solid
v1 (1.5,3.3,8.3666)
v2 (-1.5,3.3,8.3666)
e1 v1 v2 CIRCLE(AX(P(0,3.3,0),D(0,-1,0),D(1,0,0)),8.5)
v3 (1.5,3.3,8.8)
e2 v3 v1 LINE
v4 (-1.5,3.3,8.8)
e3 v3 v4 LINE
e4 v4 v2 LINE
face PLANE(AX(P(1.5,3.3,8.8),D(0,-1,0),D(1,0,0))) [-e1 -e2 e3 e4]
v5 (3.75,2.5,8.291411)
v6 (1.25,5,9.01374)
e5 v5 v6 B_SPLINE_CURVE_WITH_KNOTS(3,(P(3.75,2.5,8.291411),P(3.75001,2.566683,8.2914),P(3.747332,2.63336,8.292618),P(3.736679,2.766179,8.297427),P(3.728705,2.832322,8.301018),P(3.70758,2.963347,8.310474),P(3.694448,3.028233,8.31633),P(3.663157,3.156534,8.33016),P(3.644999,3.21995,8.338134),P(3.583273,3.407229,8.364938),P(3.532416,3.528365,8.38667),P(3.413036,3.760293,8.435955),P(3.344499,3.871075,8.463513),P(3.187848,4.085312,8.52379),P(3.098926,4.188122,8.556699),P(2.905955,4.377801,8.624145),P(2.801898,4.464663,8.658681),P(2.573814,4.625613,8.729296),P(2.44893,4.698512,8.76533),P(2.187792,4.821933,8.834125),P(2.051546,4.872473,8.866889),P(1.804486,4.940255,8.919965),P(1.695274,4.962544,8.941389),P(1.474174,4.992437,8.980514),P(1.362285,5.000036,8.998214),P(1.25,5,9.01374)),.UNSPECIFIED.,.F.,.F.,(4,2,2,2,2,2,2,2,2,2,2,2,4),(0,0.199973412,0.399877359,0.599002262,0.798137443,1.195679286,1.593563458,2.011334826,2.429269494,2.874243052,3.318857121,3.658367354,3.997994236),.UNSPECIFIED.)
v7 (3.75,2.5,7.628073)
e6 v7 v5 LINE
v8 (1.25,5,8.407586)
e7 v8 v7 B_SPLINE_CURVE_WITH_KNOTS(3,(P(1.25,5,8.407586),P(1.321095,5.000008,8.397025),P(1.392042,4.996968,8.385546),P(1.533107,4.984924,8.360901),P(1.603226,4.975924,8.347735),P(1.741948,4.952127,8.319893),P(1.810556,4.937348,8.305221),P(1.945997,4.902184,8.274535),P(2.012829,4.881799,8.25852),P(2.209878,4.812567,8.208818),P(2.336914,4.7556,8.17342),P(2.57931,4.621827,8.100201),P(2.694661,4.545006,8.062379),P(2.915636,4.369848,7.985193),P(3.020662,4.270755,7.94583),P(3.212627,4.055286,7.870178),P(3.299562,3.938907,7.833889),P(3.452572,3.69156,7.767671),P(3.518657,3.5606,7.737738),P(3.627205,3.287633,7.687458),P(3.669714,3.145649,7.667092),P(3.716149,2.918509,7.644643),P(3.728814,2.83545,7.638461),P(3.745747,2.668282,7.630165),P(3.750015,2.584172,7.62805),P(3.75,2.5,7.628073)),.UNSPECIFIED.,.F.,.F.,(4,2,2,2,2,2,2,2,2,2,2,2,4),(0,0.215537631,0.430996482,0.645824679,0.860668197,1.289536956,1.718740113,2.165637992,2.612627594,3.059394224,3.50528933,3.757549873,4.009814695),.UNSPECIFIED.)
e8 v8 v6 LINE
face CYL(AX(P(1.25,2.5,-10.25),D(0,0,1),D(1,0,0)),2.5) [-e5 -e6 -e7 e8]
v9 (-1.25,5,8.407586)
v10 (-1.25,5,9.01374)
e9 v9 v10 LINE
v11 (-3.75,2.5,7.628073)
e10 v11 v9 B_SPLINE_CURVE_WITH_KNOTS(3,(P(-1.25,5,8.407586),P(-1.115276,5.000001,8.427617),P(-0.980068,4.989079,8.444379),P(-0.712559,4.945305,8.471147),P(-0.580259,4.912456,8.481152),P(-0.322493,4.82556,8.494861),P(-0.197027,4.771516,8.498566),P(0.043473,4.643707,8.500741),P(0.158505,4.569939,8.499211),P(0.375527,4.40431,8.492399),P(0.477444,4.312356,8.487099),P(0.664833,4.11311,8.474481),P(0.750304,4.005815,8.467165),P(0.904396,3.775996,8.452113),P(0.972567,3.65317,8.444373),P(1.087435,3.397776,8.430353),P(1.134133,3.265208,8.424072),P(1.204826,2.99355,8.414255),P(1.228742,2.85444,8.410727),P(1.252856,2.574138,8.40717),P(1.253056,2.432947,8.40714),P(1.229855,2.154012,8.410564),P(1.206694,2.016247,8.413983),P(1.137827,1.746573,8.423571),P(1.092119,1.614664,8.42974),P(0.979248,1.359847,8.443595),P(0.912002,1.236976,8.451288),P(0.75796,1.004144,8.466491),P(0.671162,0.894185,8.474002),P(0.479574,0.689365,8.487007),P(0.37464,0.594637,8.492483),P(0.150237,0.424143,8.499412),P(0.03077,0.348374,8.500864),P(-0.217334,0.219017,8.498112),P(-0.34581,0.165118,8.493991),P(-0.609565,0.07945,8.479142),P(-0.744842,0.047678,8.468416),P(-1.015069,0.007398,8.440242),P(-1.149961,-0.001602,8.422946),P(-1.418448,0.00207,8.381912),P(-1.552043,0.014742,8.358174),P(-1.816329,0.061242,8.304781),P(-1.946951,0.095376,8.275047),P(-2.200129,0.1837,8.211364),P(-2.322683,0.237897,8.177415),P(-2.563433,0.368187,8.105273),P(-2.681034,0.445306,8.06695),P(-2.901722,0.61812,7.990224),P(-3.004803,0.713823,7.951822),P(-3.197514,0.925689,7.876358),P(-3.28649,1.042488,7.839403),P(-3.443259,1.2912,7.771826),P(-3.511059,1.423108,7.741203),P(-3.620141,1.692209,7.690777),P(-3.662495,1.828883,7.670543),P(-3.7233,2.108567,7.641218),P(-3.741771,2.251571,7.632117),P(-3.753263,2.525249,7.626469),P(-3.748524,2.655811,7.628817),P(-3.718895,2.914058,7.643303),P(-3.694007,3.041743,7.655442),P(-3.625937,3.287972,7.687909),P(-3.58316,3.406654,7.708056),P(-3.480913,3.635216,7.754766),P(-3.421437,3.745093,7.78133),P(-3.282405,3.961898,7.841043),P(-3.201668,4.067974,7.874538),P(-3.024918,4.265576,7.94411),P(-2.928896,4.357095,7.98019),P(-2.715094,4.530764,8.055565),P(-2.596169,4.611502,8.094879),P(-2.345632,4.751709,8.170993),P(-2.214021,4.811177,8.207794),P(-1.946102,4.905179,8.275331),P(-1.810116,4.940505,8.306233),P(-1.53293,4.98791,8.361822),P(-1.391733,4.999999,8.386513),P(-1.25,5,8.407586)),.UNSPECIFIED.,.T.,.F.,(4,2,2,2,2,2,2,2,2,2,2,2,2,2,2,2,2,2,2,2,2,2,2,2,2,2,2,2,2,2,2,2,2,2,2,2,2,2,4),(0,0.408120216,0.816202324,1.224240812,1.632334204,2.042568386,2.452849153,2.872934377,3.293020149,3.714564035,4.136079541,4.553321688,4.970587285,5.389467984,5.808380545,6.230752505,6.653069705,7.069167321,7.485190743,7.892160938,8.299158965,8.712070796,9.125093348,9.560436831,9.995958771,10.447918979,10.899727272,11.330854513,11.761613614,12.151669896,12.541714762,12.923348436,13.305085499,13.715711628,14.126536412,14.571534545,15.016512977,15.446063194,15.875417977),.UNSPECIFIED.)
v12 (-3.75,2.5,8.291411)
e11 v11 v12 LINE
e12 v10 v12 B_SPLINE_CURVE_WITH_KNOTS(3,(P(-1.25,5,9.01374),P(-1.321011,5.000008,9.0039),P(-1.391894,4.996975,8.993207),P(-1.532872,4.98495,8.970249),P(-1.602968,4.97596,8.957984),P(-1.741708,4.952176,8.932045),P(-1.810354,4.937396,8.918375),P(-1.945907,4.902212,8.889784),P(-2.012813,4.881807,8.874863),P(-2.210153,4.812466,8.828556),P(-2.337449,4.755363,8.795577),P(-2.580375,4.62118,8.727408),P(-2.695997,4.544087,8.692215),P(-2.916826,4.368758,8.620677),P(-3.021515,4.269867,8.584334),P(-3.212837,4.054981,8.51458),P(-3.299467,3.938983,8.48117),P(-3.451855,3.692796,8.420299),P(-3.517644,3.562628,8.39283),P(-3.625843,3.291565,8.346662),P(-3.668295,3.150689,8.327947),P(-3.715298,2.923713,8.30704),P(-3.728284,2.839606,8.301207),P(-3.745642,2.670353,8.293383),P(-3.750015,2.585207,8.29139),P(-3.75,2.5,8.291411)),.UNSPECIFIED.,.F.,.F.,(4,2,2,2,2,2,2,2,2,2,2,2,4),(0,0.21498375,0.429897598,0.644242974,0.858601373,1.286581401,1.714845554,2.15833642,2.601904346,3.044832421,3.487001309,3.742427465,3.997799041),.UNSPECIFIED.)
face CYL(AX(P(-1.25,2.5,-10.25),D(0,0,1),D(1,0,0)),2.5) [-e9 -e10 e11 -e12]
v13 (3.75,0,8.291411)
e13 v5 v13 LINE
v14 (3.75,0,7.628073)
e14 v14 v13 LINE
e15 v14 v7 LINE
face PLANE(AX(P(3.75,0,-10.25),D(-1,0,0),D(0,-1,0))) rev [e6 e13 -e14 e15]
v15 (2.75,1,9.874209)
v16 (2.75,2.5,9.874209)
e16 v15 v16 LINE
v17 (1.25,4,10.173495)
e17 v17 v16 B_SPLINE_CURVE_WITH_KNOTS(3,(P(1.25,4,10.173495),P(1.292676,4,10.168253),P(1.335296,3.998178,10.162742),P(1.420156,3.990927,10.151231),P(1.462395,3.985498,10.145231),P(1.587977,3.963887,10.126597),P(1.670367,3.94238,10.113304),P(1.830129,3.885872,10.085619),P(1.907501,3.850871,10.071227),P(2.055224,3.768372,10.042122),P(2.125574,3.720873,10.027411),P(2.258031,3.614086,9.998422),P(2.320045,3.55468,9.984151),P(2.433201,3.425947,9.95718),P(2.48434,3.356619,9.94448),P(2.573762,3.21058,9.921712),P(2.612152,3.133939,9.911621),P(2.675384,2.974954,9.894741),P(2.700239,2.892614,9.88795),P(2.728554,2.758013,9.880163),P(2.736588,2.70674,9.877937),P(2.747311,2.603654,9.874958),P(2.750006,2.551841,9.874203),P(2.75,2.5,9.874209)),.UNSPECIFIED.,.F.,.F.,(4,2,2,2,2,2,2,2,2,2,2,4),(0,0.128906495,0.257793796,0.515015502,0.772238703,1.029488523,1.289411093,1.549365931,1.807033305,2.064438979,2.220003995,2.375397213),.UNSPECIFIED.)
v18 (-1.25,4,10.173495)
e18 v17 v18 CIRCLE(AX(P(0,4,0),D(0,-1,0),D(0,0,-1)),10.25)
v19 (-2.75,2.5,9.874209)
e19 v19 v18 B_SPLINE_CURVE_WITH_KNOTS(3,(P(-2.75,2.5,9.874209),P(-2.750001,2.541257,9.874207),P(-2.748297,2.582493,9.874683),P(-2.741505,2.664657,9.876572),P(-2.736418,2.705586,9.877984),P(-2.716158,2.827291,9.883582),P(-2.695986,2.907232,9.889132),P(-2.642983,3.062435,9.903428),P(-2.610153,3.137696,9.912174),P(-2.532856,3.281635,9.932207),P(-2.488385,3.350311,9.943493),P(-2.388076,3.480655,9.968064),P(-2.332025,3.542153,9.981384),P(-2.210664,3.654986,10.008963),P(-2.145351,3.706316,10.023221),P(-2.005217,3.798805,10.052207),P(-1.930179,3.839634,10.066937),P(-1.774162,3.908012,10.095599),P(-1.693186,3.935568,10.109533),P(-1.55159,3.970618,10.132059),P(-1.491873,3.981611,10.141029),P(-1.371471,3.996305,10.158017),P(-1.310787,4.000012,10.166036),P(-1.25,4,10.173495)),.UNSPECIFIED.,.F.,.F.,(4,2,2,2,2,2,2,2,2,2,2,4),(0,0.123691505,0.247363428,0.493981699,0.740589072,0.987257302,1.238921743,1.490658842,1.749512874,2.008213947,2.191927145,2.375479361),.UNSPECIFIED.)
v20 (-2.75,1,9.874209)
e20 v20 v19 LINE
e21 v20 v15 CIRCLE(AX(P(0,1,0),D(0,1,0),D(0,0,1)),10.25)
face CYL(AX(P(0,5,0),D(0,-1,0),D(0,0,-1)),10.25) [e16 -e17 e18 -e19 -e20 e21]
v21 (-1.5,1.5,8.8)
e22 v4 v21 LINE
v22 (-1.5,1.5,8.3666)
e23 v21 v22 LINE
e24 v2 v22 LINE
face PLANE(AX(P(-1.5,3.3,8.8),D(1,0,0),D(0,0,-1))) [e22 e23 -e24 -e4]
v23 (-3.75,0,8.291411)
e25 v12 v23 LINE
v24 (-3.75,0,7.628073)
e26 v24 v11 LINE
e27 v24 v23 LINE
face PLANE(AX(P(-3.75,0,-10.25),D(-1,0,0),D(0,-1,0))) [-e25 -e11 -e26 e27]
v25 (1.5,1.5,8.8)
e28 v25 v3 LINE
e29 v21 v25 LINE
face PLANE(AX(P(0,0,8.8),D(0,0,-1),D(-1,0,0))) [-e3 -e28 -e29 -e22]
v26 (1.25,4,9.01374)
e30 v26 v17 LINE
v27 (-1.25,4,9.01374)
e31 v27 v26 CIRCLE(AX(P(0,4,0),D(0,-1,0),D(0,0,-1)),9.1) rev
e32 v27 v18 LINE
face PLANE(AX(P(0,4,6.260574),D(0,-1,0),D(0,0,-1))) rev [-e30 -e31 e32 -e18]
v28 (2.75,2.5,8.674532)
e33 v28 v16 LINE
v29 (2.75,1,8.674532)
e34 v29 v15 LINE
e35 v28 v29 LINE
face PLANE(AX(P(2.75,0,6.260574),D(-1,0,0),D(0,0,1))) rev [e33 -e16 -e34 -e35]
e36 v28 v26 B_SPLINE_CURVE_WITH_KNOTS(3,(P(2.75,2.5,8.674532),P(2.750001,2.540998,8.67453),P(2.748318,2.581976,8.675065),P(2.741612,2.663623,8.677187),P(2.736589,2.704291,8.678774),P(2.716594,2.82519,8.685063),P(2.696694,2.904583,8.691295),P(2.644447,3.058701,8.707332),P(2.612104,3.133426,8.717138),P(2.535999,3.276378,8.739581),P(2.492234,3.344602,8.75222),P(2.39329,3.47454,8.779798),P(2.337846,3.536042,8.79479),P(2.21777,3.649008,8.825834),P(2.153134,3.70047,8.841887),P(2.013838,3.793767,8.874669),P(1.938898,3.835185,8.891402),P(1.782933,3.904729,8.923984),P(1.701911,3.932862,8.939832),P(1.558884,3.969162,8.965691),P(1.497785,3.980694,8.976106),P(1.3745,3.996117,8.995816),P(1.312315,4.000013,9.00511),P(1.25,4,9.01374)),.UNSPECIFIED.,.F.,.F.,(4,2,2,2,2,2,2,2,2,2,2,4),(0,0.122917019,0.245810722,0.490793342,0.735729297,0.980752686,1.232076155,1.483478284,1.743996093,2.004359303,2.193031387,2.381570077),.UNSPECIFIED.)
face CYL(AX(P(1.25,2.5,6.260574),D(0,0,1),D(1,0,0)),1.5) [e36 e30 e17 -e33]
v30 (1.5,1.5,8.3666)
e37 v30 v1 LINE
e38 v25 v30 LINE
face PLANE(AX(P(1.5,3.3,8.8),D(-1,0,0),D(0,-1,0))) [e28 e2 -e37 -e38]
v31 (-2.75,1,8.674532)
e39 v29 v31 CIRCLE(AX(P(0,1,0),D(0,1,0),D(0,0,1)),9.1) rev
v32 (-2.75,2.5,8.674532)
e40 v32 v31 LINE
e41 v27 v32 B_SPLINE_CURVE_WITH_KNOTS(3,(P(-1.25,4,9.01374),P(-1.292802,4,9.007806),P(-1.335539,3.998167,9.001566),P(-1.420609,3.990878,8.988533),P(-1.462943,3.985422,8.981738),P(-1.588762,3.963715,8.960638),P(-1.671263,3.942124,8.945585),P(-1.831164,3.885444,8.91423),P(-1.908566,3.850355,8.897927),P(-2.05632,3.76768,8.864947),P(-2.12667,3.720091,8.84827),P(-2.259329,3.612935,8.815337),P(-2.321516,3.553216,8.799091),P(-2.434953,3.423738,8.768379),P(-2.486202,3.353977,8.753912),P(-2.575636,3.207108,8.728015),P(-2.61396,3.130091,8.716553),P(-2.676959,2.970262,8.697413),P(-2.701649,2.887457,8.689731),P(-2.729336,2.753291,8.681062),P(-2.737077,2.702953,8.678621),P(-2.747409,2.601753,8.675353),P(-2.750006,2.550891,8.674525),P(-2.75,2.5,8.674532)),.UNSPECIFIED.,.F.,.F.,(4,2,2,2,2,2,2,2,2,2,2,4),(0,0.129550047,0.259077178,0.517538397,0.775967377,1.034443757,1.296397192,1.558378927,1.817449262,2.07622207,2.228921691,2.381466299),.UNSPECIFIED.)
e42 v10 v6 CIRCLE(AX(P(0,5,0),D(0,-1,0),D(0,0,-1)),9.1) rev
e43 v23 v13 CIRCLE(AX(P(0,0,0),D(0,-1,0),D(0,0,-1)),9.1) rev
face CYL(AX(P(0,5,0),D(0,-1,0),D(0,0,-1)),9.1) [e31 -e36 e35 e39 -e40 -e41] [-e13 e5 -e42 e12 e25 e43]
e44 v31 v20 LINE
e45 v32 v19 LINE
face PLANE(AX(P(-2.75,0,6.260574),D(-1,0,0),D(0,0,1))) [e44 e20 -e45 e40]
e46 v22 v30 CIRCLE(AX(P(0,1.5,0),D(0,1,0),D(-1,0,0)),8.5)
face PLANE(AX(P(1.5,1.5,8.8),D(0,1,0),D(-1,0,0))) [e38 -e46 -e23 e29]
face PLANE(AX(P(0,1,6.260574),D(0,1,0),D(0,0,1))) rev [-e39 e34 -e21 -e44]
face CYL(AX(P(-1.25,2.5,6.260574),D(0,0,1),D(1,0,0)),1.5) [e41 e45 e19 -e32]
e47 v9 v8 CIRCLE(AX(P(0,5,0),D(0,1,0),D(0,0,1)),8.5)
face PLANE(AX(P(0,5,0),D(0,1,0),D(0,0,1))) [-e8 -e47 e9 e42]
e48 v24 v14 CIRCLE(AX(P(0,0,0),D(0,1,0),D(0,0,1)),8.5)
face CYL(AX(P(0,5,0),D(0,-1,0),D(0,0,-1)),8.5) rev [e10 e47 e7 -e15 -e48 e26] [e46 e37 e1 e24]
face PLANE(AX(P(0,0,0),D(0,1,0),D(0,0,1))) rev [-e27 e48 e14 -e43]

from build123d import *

# Parameters (mm, degrees)
SKETCH1_R               = 10.25
SKETCH1_R_2             = 8.5
BOSS_EXTRUDE1_DEPTH     = 5
CUT_EXTRUDE1_START      = -10.2500001
CUT_EXTRUDE1_OUTLINE_W  = 20.5
CUT_EXTRUDE1_OUTLINE_H  = 5
CUT_EXTRUDE1_DEPTH      = 17.878072963
CUT_EXTRUDE1_START_2    = 7.628072863
CUT_EXTRUDE1_2_DEPTH    = 2.545422212
CUT_EXTRUDE7_REACH      = 26.005
CUT_EXTRUDE7_END_RADIUS = 9.1
CUT_EXTRUDE7_START      = 12
SKETCH3_W               = 3
SKETCH3_H               = 1.8
CUT_EXTRUDE8_DEPTH      = 8.8


# Read off the part's stored shape, not the designer's step: Cut-Extrude1
with BuildPart() as part:
    # Sketch1 → Boss-Extrude1 (new body)
    with BuildSketch(Plane(origin=(0, 0, 0), x_dir=(1, 0, 0), z_dir=(0, 1, 0))):
        with Locations(Location((0, 0, 0), (0, 0, 270))):
            Circle(SKETCH1_R)
        with Locations(Location((0, 0, 0), (0, 0, 270))):
            Circle(SKETCH1_R_2, mode=Mode.SUBTRACT)
    extrude(amount=BOSS_EXTRUDE1_DEPTH)

    # Cut-Extrude1 outline → Cut-Extrude1 (cut)
    with BuildSketch(Plane.XY.offset(CUT_EXTRUDE1_START)):
        with Locations((0, 2.5)):
            Rectangle(CUT_EXTRUDE1_OUTLINE_W, CUT_EXTRUDE1_OUTLINE_H)
    extrude(amount=CUT_EXTRUDE1_DEPTH, mode=Mode.SUBTRACT)

    # Cut-Extrude1 2 outline → Cut-Extrude1 2 (cut)
    with BuildSketch(Plane.XY.offset(CUT_EXTRUDE1_START_2)):
        with BuildLine():
            ThreePointArc((-3.75, 2.5), (-3.017766953, 4.267766953), (-1.25, 5))
            Line((-1.25, 5), (-10.25, 5))
            Line((-10.25, 5), (-10.25, 0))
            Line((-10.25, 0), (-3.75, 0))
            Line((-3.75, 0), (-3.75, 2.5))
        make_face()
        with BuildLine():
            Line((10.25, 5), (1.25, 5))
            ThreePointArc((1.25, 5), (3.017766953, 4.267766953), (3.75, 2.5))
            Line((3.75, 2.5), (3.75, 0))
            Line((3.75, 0), (10.25, 0))
            Line((10.25, 0), (10.25, 5))
        make_face()
    extrude(amount=CUT_EXTRUDE1_2_DEPTH, mode=Mode.SUBTRACT)

    # Cut-Extrude7: up to this cylinder (the profile starts outside it)
    cut_extrude7_end = Plane(origin=(0, 2.7341405, 0), z_dir=(0, -1, 0)) * Cylinder(CUT_EXTRUDE7_END_RADIUS, 75.561441, mode=Mode.PRIVATE)
    # Sketch2<4> → Cut-Extrude7 (cut, up to the surface)
    with BuildSketch(Plane.XY.offset(CUT_EXTRUDE7_START), mode=Mode.PRIVATE) as cut_extrude7_sk1:
        with BuildLine():
            Line((1.25, 5), (-1.25, 5))
            ThreePointArc((-1.25, 5), (-3.017766953, 4.267766953), (-3.75, 2.5))
            ThreePointArc((-3.75, 2.5), (-3.017766953, 0.732233047), (-1.25, 0))
            Line((-1.25, 0), (1.25, 0))
            ThreePointArc((1.25, 0), (3.017766953, 0.732233047), (3.75, 2.5))
            ThreePointArc((3.75, 2.5), (3.017766953, 4.267766953), (1.25, 5))
        make_face()
        with BuildLine():
            ThreePointArc((-2.75, 2.5), (-2.310660172, 3.560660172), (-1.25, 4))
            Line((-1.25, 4), (1.25, 4))
            ThreePointArc((1.25, 4), (2.310660172, 3.560660172), (2.75, 2.5))
            Line((2.75, 2.5), (2.75, 1))
            Line((2.75, 1), (1.25, 1))
            Line((1.25, 1), (-1.25, 1))
            Line((-1.25, 1), (-2.75, 1))
            Line((-2.75, 1), (-2.75, 2.5))
        make_face(mode=Mode.SUBTRACT)
    cut_extrude7_tool1 = extrude(cut_extrude7_sk1.sketch, amount=-CUT_EXTRUDE7_REACH, mode=Mode.PRIVATE) - cut_extrude7_end
    add(cut_extrude7_tool1.solids().sort_by_distance((0, 4.909861, 12))[0], mode=Mode.SUBTRACT)
    # Sketch2<4> → Cut-Extrude7 (cut, up to the surface)
    with BuildSketch(Plane.XY.offset(CUT_EXTRUDE7_START), mode=Mode.PRIVATE) as cut_extrude7_sk2:
        with BuildLine():
            ThreePointArc((-1.25, 0), (-3.017766953, 0.732233047), (-3.75, 2.5))
            Line((-3.75, 2.5), (-3.75, 0))
            Line((-3.75, 0), (-1.25, 0))
        make_face()
    cut_extrude7_tool2 = extrude(cut_extrude7_sk2.sketch, amount=-CUT_EXTRUDE7_REACH, mode=Mode.PRIVATE) - cut_extrude7_end
    add(cut_extrude7_tool2.solids().sort_by_distance((-3.19158, 0.55842, 12))[0], mode=Mode.SUBTRACT)
    # Sketch2<4> → Cut-Extrude7 (cut, up to the surface)
    with BuildSketch(Plane.XY.offset(CUT_EXTRUDE7_START), mode=Mode.PRIVATE) as cut_extrude7_sk3:
        with BuildLine():
            Line((3.75, 0), (3.75, 2.5))
            ThreePointArc((3.75, 2.5), (3.017766953, 0.732233047), (1.25, 0))
            Line((1.25, 0), (3.75, 0))
        make_face()
    cut_extrude7_tool3 = extrude(cut_extrude7_sk3.sketch, amount=-CUT_EXTRUDE7_REACH, mode=Mode.PRIVATE) - cut_extrude7_end
    add(cut_extrude7_tool3.solids().sort_by_distance((3.19158, 0.55842, 12))[0], mode=Mode.SUBTRACT)

    # Sketch3 → Cut-Extrude8 (cut)
    with BuildSketch(Plane.XY):
        with Locations((0, 2.4)):
            Rectangle(SKETCH3_W, SKETCH3_H)
    extrude(amount=CUT_EXTRUDE8_DEPTH, mode=Mode.SUBTRACT)


solid = part.part
